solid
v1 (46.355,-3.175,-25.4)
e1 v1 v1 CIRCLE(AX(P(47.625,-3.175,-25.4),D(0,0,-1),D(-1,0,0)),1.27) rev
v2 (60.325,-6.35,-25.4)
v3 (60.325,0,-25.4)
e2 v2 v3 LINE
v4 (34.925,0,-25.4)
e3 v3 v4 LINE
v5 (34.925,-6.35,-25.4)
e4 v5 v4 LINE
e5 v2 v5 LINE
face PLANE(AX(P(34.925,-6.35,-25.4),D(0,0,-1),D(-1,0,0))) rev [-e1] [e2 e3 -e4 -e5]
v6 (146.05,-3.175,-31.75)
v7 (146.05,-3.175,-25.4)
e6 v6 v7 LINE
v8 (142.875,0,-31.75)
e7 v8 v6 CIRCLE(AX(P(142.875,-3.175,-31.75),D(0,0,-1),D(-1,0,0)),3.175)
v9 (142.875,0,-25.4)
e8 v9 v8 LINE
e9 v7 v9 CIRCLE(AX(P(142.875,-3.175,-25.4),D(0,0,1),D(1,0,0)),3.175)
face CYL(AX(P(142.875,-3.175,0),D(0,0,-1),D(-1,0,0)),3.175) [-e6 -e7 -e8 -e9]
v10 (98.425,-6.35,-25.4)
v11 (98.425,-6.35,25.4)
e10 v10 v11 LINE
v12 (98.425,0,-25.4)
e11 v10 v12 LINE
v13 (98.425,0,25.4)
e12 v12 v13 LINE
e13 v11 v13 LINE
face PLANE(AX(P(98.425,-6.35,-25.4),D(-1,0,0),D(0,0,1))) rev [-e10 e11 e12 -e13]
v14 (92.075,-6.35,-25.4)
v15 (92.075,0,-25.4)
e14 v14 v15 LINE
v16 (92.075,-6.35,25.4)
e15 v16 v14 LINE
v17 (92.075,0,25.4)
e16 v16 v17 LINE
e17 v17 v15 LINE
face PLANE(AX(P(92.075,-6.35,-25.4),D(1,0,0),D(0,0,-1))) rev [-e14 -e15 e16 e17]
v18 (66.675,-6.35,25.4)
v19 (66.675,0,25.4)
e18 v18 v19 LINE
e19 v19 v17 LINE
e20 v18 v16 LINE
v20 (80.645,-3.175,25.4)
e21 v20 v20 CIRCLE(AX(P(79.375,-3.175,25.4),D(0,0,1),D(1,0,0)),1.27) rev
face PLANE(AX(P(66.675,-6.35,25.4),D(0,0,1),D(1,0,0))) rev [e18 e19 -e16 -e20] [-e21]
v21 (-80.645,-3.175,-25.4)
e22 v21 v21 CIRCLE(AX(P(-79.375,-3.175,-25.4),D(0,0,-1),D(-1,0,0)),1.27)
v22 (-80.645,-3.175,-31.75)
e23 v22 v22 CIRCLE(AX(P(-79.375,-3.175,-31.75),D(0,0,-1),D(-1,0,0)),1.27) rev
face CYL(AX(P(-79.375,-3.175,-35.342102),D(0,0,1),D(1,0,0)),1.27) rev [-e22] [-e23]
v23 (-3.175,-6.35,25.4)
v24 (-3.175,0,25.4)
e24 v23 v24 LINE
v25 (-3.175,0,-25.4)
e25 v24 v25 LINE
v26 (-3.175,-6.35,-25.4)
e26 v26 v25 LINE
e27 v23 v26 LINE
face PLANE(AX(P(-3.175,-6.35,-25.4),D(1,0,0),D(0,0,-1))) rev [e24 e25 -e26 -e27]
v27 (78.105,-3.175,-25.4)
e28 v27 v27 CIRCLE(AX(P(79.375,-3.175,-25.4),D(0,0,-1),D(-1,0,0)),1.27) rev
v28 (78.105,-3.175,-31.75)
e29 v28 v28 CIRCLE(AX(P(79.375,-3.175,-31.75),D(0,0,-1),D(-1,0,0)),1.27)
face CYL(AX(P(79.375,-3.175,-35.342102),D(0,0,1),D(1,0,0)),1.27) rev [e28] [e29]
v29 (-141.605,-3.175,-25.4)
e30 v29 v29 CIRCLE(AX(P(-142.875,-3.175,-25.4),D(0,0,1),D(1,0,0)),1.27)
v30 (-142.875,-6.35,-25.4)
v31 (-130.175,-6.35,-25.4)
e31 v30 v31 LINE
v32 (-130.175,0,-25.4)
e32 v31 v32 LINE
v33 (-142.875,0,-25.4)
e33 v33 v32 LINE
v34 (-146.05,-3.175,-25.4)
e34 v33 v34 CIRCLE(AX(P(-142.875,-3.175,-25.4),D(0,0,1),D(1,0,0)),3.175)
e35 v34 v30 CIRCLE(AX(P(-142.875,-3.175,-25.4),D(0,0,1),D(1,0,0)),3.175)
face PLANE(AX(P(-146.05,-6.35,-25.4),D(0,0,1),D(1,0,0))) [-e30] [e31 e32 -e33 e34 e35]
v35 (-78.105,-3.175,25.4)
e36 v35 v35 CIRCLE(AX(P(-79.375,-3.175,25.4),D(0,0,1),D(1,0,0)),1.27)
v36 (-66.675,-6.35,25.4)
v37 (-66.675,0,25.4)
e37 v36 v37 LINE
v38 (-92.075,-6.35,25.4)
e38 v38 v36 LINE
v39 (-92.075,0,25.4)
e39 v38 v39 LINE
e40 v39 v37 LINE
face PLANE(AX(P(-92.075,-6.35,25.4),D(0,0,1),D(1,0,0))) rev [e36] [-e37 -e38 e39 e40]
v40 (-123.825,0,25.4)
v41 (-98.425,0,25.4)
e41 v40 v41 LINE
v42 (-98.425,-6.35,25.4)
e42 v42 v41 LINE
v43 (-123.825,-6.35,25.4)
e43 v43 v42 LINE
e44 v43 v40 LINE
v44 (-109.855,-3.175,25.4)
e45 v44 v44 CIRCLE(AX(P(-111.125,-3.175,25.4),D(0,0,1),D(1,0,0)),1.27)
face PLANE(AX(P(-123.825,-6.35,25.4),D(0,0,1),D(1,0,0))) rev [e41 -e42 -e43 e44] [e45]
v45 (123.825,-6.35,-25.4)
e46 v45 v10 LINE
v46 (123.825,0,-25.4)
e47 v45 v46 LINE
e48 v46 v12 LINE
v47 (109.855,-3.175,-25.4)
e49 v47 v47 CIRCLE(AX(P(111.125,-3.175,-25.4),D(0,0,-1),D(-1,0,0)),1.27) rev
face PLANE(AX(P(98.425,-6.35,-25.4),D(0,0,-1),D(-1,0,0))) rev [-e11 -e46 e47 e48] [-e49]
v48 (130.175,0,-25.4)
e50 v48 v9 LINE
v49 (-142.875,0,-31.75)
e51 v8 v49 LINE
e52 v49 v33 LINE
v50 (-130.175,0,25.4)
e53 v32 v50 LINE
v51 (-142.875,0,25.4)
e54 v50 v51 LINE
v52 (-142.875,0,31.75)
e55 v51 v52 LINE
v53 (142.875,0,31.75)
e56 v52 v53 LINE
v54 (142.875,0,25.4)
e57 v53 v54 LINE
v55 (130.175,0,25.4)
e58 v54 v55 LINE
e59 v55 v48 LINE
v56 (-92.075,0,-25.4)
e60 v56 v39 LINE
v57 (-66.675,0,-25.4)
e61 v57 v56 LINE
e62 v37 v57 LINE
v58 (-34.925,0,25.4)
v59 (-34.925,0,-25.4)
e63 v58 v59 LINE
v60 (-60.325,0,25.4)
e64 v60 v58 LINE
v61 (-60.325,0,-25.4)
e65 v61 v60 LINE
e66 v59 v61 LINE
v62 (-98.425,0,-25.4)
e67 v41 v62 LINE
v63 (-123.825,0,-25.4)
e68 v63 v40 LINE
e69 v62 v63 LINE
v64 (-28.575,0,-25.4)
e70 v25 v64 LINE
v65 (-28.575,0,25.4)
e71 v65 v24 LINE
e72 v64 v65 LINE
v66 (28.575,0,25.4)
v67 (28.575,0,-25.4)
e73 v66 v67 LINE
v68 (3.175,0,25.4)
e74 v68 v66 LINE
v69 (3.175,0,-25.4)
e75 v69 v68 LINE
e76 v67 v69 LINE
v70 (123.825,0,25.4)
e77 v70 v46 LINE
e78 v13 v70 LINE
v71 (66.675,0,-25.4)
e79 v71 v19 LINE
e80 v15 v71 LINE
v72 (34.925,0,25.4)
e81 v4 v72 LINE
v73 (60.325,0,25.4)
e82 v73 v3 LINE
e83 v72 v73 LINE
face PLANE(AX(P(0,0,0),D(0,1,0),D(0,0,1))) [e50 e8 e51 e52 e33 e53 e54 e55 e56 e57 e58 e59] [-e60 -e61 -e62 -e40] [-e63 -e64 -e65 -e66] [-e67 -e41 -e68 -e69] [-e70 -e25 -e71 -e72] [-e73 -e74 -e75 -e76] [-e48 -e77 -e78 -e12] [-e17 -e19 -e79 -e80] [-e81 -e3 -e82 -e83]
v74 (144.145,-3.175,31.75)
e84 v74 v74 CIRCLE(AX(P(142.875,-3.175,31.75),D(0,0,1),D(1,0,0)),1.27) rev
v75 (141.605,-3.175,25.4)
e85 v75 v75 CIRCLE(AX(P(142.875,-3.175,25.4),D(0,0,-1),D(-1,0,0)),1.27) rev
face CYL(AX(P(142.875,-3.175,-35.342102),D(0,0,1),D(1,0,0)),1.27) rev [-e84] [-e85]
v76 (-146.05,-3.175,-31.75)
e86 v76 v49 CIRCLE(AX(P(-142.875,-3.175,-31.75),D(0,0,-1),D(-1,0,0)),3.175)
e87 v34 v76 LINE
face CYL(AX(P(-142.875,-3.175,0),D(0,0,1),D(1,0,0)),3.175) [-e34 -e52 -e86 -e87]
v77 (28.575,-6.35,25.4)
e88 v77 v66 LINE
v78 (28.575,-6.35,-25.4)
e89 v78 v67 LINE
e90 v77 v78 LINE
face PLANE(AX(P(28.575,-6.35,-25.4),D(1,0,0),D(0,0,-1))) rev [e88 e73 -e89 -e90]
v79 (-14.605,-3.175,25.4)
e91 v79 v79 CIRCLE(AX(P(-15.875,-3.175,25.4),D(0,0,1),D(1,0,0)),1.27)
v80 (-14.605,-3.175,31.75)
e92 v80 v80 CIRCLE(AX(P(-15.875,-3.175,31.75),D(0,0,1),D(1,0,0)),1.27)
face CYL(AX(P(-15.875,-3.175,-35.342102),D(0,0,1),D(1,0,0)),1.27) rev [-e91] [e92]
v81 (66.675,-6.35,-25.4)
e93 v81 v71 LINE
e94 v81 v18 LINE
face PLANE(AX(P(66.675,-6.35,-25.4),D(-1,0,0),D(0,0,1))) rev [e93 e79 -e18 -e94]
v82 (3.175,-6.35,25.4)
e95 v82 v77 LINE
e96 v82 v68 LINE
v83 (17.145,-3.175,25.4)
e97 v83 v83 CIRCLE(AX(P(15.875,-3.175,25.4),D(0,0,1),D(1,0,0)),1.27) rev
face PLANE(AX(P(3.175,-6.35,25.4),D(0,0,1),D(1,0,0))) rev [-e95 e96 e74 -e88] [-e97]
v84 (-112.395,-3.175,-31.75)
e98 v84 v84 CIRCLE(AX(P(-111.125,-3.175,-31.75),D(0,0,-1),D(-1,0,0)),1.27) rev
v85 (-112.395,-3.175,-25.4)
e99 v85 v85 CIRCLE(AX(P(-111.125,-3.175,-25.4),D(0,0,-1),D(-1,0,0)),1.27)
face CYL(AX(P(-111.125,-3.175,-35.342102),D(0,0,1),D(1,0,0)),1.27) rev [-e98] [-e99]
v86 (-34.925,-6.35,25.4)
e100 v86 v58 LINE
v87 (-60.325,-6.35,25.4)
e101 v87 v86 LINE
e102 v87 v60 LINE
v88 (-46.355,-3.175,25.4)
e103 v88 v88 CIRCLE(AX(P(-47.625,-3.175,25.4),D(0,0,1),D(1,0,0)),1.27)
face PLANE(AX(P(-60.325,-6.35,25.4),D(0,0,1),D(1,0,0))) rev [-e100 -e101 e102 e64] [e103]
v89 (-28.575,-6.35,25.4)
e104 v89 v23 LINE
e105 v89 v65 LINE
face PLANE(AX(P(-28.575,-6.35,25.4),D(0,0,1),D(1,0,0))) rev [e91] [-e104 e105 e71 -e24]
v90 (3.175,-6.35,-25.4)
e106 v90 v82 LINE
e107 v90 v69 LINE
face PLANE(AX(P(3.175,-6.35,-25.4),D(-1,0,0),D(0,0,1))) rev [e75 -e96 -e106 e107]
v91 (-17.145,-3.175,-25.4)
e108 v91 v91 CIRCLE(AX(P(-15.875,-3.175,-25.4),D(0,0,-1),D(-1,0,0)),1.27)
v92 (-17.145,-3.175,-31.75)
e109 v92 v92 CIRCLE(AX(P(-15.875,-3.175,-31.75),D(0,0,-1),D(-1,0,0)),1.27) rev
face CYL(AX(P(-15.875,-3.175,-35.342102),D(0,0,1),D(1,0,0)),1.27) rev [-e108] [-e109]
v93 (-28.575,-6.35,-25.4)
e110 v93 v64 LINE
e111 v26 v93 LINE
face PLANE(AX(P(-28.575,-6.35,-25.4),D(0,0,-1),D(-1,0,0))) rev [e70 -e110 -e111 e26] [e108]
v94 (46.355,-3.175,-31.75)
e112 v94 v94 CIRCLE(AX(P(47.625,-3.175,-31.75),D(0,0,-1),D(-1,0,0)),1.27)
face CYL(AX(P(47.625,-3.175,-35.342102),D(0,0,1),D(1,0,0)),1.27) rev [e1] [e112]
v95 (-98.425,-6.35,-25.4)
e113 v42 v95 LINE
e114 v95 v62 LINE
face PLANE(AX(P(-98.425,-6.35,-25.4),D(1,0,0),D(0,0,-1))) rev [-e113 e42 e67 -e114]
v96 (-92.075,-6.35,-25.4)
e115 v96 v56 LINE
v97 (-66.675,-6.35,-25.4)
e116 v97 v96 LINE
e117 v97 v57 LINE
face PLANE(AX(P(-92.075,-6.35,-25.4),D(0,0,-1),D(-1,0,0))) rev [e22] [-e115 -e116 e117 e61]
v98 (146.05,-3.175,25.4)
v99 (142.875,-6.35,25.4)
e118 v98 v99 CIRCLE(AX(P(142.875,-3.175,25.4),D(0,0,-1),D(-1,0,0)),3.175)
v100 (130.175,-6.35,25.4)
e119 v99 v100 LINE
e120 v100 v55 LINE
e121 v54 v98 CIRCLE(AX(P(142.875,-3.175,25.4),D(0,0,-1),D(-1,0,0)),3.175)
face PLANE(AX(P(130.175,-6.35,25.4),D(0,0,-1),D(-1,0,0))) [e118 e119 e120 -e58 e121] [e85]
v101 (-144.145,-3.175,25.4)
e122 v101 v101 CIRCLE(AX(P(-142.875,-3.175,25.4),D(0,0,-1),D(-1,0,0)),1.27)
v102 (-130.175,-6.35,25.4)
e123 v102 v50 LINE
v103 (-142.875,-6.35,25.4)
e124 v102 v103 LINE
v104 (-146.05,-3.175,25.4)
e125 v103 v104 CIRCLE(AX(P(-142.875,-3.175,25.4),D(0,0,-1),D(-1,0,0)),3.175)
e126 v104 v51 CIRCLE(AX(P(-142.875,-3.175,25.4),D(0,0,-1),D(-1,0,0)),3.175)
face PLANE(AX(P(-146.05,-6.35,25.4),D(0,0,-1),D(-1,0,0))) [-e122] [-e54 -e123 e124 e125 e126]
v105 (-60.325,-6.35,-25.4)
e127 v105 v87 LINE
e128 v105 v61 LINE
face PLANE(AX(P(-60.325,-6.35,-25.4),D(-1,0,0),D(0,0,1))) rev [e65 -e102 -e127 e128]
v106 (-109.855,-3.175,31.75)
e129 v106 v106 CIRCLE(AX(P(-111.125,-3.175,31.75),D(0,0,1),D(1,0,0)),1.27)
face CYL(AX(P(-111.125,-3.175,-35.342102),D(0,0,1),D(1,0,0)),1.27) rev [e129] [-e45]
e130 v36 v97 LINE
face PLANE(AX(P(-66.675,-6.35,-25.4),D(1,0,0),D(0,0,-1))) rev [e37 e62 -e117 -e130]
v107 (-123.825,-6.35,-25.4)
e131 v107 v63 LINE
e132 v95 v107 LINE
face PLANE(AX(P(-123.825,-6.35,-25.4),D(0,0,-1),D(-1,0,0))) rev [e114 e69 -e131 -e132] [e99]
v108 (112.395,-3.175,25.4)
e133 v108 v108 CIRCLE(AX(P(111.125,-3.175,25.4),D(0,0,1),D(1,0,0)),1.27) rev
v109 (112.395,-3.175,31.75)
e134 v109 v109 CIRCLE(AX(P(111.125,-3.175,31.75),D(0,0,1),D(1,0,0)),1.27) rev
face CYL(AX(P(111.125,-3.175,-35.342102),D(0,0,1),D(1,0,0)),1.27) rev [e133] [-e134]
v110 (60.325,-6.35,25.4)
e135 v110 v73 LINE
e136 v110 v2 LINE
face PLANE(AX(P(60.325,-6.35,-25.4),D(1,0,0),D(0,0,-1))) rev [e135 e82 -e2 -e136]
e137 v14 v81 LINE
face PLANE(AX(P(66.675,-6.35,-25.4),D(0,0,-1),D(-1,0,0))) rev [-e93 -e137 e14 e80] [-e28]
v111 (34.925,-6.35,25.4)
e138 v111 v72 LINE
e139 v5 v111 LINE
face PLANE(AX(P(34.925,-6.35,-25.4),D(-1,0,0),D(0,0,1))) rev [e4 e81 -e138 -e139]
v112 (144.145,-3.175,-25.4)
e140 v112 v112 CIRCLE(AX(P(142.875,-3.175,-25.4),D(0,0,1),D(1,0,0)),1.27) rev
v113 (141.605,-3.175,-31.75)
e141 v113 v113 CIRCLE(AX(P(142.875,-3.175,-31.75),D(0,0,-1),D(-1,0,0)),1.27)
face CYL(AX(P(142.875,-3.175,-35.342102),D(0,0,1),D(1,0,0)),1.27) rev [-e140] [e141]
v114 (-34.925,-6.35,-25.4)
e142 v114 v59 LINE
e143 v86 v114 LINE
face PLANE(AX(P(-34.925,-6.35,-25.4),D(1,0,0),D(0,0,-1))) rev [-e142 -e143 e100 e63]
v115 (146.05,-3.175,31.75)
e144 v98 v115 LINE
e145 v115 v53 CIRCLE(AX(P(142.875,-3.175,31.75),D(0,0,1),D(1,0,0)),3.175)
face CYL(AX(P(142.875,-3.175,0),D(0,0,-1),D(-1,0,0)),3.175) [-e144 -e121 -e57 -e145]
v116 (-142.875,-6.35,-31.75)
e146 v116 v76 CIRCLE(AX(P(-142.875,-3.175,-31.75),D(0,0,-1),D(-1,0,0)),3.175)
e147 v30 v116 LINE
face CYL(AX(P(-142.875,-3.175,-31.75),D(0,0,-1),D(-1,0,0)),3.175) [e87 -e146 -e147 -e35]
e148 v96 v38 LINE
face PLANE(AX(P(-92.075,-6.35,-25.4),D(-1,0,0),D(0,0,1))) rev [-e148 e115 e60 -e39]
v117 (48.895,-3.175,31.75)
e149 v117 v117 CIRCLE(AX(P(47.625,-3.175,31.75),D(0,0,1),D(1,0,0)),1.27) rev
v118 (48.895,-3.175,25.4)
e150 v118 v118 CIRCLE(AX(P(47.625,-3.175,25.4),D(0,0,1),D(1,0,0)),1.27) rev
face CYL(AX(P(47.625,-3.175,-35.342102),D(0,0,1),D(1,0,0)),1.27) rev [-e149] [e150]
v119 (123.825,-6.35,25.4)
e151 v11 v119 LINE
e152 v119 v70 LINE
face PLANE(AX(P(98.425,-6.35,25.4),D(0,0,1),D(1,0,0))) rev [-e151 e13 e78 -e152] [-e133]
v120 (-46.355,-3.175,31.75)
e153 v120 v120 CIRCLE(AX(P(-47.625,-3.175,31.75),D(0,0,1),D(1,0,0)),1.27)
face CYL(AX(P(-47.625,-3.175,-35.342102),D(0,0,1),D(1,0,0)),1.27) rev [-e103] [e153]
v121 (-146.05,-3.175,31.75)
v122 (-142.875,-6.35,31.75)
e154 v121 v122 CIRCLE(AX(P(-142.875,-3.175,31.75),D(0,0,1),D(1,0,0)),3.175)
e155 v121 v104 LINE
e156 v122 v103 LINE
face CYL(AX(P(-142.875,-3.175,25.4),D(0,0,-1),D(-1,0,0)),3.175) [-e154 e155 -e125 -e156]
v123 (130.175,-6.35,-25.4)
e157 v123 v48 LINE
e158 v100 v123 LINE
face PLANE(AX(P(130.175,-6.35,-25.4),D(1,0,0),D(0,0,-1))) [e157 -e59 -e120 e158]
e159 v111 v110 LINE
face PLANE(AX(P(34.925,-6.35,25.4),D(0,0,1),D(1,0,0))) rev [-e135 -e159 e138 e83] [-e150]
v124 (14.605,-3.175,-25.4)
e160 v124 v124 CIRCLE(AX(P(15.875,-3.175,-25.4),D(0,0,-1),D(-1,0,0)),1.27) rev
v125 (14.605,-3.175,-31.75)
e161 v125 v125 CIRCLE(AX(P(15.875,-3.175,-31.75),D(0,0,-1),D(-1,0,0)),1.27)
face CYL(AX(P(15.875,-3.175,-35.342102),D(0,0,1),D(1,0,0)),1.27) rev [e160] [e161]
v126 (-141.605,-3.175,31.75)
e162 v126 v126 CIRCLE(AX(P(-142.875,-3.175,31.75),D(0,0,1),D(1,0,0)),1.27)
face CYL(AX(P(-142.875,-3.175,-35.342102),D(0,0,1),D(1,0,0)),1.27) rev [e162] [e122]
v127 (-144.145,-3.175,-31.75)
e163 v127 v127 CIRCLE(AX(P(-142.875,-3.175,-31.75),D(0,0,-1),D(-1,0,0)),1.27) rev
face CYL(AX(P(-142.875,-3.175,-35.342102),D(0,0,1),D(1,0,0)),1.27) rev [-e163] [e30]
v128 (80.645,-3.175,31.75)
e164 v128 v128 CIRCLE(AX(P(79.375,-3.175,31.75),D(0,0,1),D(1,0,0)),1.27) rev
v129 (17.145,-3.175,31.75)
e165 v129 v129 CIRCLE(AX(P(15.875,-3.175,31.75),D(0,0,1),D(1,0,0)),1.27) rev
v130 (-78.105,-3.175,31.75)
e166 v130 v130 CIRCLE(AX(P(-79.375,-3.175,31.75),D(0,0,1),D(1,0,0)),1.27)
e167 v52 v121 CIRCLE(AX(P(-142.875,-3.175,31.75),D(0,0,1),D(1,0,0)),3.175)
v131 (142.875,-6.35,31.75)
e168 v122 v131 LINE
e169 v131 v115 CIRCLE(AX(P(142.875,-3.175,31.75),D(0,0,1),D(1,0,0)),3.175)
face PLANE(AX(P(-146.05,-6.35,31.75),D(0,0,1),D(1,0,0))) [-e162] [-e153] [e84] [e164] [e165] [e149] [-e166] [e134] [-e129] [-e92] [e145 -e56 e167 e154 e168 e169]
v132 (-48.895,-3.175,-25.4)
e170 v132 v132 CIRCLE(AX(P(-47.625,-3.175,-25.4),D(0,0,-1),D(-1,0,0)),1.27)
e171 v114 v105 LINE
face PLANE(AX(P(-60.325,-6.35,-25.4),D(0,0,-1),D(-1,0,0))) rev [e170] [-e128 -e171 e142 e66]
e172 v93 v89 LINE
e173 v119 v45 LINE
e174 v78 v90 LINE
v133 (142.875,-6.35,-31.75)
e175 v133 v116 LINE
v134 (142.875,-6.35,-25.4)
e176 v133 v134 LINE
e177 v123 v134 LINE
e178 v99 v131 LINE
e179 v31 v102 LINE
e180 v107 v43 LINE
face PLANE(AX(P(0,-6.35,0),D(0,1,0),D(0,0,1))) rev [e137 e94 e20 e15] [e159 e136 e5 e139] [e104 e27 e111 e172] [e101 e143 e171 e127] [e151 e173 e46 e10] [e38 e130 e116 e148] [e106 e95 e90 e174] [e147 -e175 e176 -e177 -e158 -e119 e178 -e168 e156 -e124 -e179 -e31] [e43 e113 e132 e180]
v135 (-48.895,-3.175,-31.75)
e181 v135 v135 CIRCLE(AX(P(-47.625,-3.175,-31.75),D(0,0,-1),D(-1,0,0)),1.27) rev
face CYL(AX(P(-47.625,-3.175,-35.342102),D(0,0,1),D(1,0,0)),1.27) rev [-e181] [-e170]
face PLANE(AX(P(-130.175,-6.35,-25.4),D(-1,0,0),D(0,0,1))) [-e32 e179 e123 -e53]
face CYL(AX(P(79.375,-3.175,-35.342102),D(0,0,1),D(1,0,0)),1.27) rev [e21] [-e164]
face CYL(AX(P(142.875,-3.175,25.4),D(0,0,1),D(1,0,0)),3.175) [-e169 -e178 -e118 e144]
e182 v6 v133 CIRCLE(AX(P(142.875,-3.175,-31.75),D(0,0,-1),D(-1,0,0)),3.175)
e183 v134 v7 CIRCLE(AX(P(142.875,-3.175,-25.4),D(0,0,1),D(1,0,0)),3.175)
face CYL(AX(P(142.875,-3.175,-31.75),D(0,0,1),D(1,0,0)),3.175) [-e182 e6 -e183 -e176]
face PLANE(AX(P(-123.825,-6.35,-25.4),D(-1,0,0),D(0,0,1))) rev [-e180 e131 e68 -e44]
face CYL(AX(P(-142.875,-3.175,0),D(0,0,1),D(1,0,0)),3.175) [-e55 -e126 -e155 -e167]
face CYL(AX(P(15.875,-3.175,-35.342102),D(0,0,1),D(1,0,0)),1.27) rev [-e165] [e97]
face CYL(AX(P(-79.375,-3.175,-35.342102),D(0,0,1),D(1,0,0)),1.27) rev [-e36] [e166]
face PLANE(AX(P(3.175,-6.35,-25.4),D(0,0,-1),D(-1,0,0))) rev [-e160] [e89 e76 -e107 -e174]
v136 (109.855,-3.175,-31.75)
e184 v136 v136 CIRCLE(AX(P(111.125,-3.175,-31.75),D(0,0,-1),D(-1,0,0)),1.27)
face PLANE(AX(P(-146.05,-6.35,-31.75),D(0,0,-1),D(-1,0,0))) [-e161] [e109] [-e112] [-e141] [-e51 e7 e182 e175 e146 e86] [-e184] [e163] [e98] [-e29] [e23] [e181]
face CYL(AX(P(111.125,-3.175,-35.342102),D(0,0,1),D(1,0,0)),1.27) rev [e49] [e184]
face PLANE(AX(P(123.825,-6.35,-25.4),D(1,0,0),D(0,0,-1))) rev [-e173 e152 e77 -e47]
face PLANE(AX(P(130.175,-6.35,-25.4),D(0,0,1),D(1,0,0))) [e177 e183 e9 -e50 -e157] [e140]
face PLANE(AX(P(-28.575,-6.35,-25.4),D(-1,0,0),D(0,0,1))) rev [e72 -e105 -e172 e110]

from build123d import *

# Parameters (mm, degrees)
SKETCH1_W           = 25.4
SKETCH1_H           = 50.8
BOSS_EXTRUDE1_DEPTH = 6.35
CUT_EXTRUDE1_REACH  = 161.384
SKETCH2_R           = 1.27
FILLET2_R           = 3.175


with BuildPart() as part:
    # Sketch1 → Boss-Extrude1 (new body)
    with BuildSketch(Plane(origin=(0, 0, 0), x_dir=(1, 0, 0), z_dir=(0, 1, 0))):
        Polygon((-146.05, 25.4), (-130.175, 25.4), (-130.175, -25.4), (-146.05, -25.4), (-146.05, -31.75), (146.05, -31.75), (146.05, -25.4), (130.175, -25.4), (130.175, 25.4), (146.05, 25.4), (146.05, 31.75), (-146.05, 31.75), align=None)
        with Locations((-15.875, 0)):
            Rectangle(SKETCH1_W, SKETCH1_H, mode=Mode.SUBTRACT)
        with Locations((111.125, 0)):
            Rectangle(SKETCH1_W, SKETCH1_H, mode=Mode.SUBTRACT)
        with Locations((-47.625, 0)):
            Rectangle(SKETCH1_W, SKETCH1_H, mode=Mode.SUBTRACT)
        with Locations((-79.375, 0)):
            Rectangle(SKETCH1_W, SKETCH1_H, mode=Mode.SUBTRACT)
        with Locations((-111.125, 0)):
            Rectangle(SKETCH1_W, SKETCH1_H, mode=Mode.SUBTRACT)
        with Locations((79.375, 0)):
            Rectangle(SKETCH1_W, SKETCH1_H, mode=Mode.SUBTRACT)
        with Locations((47.625, 0)):
            Rectangle(SKETCH1_W, SKETCH1_H, mode=Mode.SUBTRACT)
        with Locations((15.875, 0)):
            Rectangle(SKETCH1_W, SKETCH1_H, mode=Mode.SUBTRACT)
    extrude(amount=-BOSS_EXTRUDE1_DEPTH)

    # Cut-Extrude1: up to this face of the body (flat: up to its plane)
    cut_extrude1_end = Plane(part.part.faces().sort_by_distance((0, -3.175, -31.75))[0])
    # Sketch2 → Cut-Extrude1 (cut, up to the picked face)
    with BuildSketch(Plane.XY.offset(31.75), mode=Mode.PRIVATE) as cut_extrude1_sk1:
        with Locations((-142.875, -3.175)):
            Circle(SKETCH2_R)
    cut_extrude1_tool1 = split(extrude(cut_extrude1_sk1.sketch, amount=-CUT_EXTRUDE1_REACH, mode=Mode.PRIVATE), bisect_by=cut_extrude1_end, keep=Keep.BOTH, mode=Mode.PRIVATE)
    # Sketch2 → Cut-Extrude1 (cut, up to the picked face)
    with BuildSketch(Plane.XY.offset(31.75), mode=Mode.PRIVATE) as cut_extrude1_sk2:
        with Locations((-111.125, -3.175)):
            Circle(SKETCH2_R)
    cut_extrude1_tool2 = split(extrude(cut_extrude1_sk2.sketch, amount=-CUT_EXTRUDE1_REACH, mode=Mode.PRIVATE), bisect_by=cut_extrude1_end, keep=Keep.BOTH, mode=Mode.PRIVATE)
    # Sketch2 → Cut-Extrude1 (cut, up to the picked face)
    with BuildSketch(Plane.XY.offset(31.75), mode=Mode.PRIVATE) as cut_extrude1_sk3:
        with Locations((-79.375, -3.175)):
            Circle(SKETCH2_R)
    cut_extrude1_tool3 = split(extrude(cut_extrude1_sk3.sketch, amount=-CUT_EXTRUDE1_REACH, mode=Mode.PRIVATE), bisect_by=cut_extrude1_end, keep=Keep.BOTH, mode=Mode.PRIVATE)
    # Sketch2 → Cut-Extrude1 (cut, up to the picked face)
    with BuildSketch(Plane.XY.offset(31.75), mode=Mode.PRIVATE) as cut_extrude1_sk4:
        with Locations((-47.625, -3.175)):
            Circle(SKETCH2_R)
    cut_extrude1_tool4 = split(extrude(cut_extrude1_sk4.sketch, amount=-CUT_EXTRUDE1_REACH, mode=Mode.PRIVATE), bisect_by=cut_extrude1_end, keep=Keep.BOTH, mode=Mode.PRIVATE)
    # Sketch2 → Cut-Extrude1 (cut, up to the picked face)
    with BuildSketch(Plane.XY.offset(31.75), mode=Mode.PRIVATE) as cut_extrude1_sk5:
        with Locations((-15.875, -3.175)):
            Circle(SKETCH2_R)
    cut_extrude1_tool5 = split(extrude(cut_extrude1_sk5.sketch, amount=-CUT_EXTRUDE1_REACH, mode=Mode.PRIVATE), bisect_by=cut_extrude1_end, keep=Keep.BOTH, mode=Mode.PRIVATE)
    # Sketch2 → Cut-Extrude1 (cut, up to the picked face)
    with BuildSketch(Plane.XY.offset(31.75), mode=Mode.PRIVATE) as cut_extrude1_sk6:
        with Locations((15.875, -3.175)):
            Circle(SKETCH2_R)
    cut_extrude1_tool6 = split(extrude(cut_extrude1_sk6.sketch, amount=-CUT_EXTRUDE1_REACH, mode=Mode.PRIVATE), bisect_by=cut_extrude1_end, keep=Keep.BOTH, mode=Mode.PRIVATE)
    # Sketch2 → Cut-Extrude1 (cut, up to the picked face)
    with BuildSketch(Plane.XY.offset(31.75), mode=Mode.PRIVATE) as cut_extrude1_sk7:
        with Locations((47.625, -3.175)):
            Circle(SKETCH2_R)
    cut_extrude1_tool7 = split(extrude(cut_extrude1_sk7.sketch, amount=-CUT_EXTRUDE1_REACH, mode=Mode.PRIVATE), bisect_by=cut_extrude1_end, keep=Keep.BOTH, mode=Mode.PRIVATE)
    # Sketch2 → Cut-Extrude1 (cut, up to the picked face)
    with BuildSketch(Plane.XY.offset(31.75), mode=Mode.PRIVATE) as cut_extrude1_sk8:
        with Locations((79.375, -3.175)):
            Circle(SKETCH2_R)
    cut_extrude1_tool8 = split(extrude(cut_extrude1_sk8.sketch, amount=-CUT_EXTRUDE1_REACH, mode=Mode.PRIVATE), bisect_by=cut_extrude1_end, keep=Keep.BOTH, mode=Mode.PRIVATE)
    # Sketch2 → Cut-Extrude1 (cut, up to the picked face)
    with BuildSketch(Plane.XY.offset(31.75), mode=Mode.PRIVATE) as cut_extrude1_sk9:
        with Locations((111.125, -3.175)):
            Circle(SKETCH2_R)
    cut_extrude1_tool9 = split(extrude(cut_extrude1_sk9.sketch, amount=-CUT_EXTRUDE1_REACH, mode=Mode.PRIVATE), bisect_by=cut_extrude1_end, keep=Keep.BOTH, mode=Mode.PRIVATE)
    # Sketch2 → Cut-Extrude1 (cut, up to the picked face)
    with BuildSketch(Plane.XY.offset(31.75), mode=Mode.PRIVATE) as cut_extrude1_sk10:
        with Locations((142.875, -3.175)):
            Circle(SKETCH2_R)
    cut_extrude1_tool10 = split(extrude(cut_extrude1_sk10.sketch, amount=-CUT_EXTRUDE1_REACH, mode=Mode.PRIVATE), bisect_by=cut_extrude1_end, keep=Keep.BOTH, mode=Mode.PRIVATE)
    add(cut_extrude1_tool1.solids().sort_by(Axis((-142.875, -3.175, 31.75), (0, 0, -1)))[0], mode=Mode.SUBTRACT)
    add(cut_extrude1_tool2.solids().sort_by(Axis((-111.125, -3.175, 31.75), (0, 0, -1)))[0], mode=Mode.SUBTRACT)
    add(cut_extrude1_tool3.solids().sort_by(Axis((-79.375, -3.175, 31.75), (0, 0, -1)))[0], mode=Mode.SUBTRACT)
    add(cut_extrude1_tool4.solids().sort_by(Axis((-47.625, -3.175, 31.75), (0, 0, -1)))[0], mode=Mode.SUBTRACT)
    add(cut_extrude1_tool5.solids().sort_by(Axis((-15.875, -3.175, 31.75), (0, 0, -1)))[0], mode=Mode.SUBTRACT)
    add(cut_extrude1_tool6.solids().sort_by(Axis((15.875, -3.175, 31.75), (0, 0, -1)))[0], mode=Mode.SUBTRACT)
    add(cut_extrude1_tool7.solids().sort_by(Axis((47.625, -3.175, 31.75), (0, 0, -1)))[0], mode=Mode.SUBTRACT)
    add(cut_extrude1_tool8.solids().sort_by(Axis((79.375, -3.175, 31.75), (0, 0, -1)))[0], mode=Mode.SUBTRACT)
    add(cut_extrude1_tool9.solids().sort_by(Axis((111.125, -3.175, 31.75), (0, 0, -1)))[0], mode=Mode.SUBTRACT)
    add(cut_extrude1_tool10.solids().sort_by(Axis((142.875, -3.175, 31.75), (0, 0, -1)))[0], mode=Mode.SUBTRACT)

    # Fillet2
    fillet2_edges = [part.edges().sort_by_distance(p)[0] for p in [
        (-146.05, -6.35, 28.575),
        (-146.05, 0, 28.575),
        (-146.05, -6.35, -28.575),
        (-146.05, 0, -28.575),
        (146.05, -6.35, -28.575),
        (146.05, 0, -28.575),
        (146.05, -6.35, 28.575),
        (146.05, 0, 28.575),
    ]]
    fillet(fillet2_edges, radius=FILLET2_R - 0.0001)  # a hair under: the kernel refuses the full size


solid = part.part
